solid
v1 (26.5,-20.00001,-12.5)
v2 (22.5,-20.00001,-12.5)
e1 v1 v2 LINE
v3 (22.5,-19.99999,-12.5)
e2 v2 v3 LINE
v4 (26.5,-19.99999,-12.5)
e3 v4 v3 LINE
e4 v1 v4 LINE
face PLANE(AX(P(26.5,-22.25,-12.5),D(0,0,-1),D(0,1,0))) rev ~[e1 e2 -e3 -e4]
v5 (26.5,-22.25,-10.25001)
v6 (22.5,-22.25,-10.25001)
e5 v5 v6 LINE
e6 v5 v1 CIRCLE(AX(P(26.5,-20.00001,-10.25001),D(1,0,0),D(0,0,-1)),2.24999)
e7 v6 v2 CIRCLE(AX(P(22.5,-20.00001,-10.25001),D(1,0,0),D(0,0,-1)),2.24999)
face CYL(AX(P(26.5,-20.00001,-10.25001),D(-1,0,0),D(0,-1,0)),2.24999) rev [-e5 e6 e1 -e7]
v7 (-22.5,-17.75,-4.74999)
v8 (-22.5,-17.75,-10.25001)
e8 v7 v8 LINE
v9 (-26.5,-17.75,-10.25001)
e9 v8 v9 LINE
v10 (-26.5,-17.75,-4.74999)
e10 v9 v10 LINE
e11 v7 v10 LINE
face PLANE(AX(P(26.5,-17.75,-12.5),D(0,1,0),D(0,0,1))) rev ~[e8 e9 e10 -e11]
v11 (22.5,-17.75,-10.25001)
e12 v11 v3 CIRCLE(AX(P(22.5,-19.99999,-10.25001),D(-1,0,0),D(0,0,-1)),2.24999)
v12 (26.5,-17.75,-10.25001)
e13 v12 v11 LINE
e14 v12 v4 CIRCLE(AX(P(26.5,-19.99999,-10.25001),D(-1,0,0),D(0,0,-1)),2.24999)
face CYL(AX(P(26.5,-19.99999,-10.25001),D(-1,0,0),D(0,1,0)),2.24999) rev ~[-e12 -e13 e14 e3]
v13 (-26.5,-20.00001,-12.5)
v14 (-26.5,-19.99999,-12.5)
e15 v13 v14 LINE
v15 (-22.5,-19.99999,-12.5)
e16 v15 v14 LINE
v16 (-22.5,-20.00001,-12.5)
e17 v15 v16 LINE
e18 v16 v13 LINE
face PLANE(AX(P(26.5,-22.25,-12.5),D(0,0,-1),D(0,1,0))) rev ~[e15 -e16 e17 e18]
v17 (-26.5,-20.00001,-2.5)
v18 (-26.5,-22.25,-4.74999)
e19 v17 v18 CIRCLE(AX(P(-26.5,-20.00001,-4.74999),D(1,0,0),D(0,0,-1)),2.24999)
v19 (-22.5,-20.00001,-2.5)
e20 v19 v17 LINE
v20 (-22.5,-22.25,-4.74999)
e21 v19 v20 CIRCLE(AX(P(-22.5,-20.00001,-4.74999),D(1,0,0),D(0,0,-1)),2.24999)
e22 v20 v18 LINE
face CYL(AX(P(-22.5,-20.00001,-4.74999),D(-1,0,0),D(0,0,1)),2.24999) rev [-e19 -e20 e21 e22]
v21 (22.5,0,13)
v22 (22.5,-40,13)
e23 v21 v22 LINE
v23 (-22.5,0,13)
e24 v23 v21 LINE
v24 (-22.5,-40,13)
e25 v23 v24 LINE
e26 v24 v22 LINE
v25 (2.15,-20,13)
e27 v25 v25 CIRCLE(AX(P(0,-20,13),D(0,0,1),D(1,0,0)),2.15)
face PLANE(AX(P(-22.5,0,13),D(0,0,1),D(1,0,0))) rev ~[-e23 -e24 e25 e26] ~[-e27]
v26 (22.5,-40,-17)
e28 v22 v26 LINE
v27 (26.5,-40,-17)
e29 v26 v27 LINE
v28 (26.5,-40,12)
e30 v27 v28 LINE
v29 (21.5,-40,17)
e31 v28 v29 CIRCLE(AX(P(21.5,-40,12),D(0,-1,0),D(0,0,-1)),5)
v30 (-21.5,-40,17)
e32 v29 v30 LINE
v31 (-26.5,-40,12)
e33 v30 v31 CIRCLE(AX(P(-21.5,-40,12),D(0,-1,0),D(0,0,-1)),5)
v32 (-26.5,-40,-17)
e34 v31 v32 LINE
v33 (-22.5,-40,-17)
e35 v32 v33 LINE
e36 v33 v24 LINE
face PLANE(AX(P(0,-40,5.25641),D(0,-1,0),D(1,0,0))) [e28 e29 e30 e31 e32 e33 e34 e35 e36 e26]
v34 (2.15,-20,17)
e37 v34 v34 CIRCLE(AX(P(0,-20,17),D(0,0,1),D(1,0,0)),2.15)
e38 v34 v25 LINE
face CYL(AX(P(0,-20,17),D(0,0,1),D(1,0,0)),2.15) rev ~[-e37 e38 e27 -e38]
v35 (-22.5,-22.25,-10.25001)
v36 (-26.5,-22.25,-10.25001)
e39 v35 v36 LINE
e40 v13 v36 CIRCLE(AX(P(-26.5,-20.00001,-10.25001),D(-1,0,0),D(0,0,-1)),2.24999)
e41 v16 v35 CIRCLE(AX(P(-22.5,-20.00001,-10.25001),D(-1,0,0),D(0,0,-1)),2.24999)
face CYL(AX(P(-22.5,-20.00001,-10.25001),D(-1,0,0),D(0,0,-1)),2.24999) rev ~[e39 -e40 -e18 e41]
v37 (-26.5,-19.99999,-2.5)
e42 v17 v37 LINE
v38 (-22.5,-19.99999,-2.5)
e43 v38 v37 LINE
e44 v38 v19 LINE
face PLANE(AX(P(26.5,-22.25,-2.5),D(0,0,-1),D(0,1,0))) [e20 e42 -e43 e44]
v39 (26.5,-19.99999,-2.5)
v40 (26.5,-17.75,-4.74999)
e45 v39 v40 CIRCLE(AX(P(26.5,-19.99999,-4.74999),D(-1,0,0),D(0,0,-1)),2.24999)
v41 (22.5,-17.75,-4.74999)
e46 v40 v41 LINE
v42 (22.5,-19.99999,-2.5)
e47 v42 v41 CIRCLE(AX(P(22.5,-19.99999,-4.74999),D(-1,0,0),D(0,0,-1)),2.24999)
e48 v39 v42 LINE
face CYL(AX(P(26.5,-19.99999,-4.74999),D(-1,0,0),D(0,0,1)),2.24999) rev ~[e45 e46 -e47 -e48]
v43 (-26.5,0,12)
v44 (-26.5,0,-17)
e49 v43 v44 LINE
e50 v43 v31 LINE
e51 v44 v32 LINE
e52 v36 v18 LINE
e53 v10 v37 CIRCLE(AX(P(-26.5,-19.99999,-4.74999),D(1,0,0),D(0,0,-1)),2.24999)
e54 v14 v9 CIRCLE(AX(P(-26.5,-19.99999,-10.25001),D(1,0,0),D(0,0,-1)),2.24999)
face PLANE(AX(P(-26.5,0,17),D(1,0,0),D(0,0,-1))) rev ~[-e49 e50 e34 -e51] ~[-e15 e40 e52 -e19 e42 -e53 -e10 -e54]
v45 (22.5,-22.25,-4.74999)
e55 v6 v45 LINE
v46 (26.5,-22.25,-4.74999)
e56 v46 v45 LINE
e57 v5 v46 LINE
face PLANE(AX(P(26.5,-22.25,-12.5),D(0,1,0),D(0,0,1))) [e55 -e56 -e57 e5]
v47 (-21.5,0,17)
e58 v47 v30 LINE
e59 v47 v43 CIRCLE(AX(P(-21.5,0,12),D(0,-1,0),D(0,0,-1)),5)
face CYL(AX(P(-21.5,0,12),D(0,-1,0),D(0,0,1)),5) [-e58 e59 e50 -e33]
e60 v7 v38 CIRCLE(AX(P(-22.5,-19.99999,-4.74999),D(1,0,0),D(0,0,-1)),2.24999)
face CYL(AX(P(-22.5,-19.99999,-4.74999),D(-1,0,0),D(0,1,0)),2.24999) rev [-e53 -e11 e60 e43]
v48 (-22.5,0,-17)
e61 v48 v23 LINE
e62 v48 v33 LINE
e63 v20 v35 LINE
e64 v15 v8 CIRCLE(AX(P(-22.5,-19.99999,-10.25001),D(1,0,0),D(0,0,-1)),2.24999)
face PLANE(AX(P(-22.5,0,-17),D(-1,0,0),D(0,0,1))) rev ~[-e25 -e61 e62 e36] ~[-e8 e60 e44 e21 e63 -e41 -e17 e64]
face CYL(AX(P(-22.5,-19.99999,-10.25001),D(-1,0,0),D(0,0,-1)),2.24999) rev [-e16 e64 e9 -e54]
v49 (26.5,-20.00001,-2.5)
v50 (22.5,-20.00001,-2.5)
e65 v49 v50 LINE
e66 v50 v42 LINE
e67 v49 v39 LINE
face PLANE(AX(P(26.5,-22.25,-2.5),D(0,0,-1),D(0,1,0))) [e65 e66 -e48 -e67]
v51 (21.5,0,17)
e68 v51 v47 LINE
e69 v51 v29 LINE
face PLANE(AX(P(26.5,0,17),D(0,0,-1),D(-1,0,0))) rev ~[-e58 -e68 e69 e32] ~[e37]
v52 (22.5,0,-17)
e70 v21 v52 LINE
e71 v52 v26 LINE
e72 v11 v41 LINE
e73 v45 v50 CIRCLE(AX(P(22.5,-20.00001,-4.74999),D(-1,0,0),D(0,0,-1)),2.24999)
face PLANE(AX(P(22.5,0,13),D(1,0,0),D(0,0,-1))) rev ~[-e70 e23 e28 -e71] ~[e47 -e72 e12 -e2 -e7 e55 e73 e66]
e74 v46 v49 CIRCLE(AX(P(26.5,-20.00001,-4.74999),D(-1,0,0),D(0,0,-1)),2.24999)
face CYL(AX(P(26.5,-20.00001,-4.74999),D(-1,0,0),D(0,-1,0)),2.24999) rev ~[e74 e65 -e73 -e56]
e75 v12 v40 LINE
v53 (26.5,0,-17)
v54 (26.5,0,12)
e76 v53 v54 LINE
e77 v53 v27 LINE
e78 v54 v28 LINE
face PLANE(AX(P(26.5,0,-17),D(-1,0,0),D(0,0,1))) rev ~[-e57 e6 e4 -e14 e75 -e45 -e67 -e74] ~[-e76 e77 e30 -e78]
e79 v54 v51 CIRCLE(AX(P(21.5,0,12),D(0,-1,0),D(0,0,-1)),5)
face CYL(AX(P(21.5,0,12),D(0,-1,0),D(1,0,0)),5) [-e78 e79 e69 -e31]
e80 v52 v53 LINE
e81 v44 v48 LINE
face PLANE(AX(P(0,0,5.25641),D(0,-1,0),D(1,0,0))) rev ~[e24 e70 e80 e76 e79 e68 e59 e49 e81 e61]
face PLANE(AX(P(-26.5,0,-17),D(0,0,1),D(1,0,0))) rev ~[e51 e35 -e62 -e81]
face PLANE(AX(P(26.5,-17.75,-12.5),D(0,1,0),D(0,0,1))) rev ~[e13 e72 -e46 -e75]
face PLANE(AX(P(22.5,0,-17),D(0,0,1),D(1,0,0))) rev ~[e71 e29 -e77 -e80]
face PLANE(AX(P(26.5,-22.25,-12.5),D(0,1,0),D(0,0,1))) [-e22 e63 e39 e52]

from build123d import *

# Parameters (mm, degrees)
F1_DEPTH = 40
F2_R     = 5
F3_R     = 2.15
F4_DEPTH = 25
F5_W     = 4.5
F5_H     = 10
F6_DEPTH = 53.001
F7_R     = 2.24999


# Not quite as in the source:
# - a fillet or chamfer is up to 0.001 mm smaller than in the source, because OpenCascade refuses the exact size


with BuildPart() as f1:
    # F0 (on Front) → F1 (new body)
    with BuildSketch(Plane.XZ):
        Polygon((22.5, -17), (26.5, -17), (26.5, 17), (-26.5, 17), (-26.5, -17), (-22.5, -17), (-22.5, 13), (22.5, 13), align=None)
    extrude(amount=F1_DEPTH)

    # F2
    f2_edges = [f1.edges().sort_by_distance(p)[0] for p in [
        (-26.5, -20, 17),
        (26.5, -20, 17),
    ]]
    fillet(f2_edges, radius=F2_R)

    # F3 (on face) → F4 (cut)
    with BuildSketch(Plane.XY.offset(17)):
        with Locations((0, -20)):
            Circle(F3_R)
    extrude(amount=-F4_DEPTH, mode=Mode.SUBTRACT)

    # F5 (on face) → F6 (cut, through all)
    with BuildSketch(Plane.YZ.offset(26.5)):
        with Locations((-20, -7.5)):
            Rectangle(F5_W, F5_H)
    extrude(amount=-F6_DEPTH, mode=Mode.SUBTRACT)

    # F7 (radius 2.25 in the source; OpenCascade refuses exactly that, so slightly less here)
    f7_edges = [f1.edges().sort_by_distance(p)[0] for p in [
        (24.5, -17.75, -2.5),
        (24.5, -22.25, -2.5),
        (24.5, -17.75, -12.5),
        (24.5, -22.25, -12.5),
        (-24.5, -17.75, -2.5),
        (-24.5, -17.75, -12.5),
        (-24.5, -22.25, -2.5),
        (-24.5, -22.25, -12.5),
    ]]
    fillet(f7_edges, radius=F7_R)


solid = f1.part
